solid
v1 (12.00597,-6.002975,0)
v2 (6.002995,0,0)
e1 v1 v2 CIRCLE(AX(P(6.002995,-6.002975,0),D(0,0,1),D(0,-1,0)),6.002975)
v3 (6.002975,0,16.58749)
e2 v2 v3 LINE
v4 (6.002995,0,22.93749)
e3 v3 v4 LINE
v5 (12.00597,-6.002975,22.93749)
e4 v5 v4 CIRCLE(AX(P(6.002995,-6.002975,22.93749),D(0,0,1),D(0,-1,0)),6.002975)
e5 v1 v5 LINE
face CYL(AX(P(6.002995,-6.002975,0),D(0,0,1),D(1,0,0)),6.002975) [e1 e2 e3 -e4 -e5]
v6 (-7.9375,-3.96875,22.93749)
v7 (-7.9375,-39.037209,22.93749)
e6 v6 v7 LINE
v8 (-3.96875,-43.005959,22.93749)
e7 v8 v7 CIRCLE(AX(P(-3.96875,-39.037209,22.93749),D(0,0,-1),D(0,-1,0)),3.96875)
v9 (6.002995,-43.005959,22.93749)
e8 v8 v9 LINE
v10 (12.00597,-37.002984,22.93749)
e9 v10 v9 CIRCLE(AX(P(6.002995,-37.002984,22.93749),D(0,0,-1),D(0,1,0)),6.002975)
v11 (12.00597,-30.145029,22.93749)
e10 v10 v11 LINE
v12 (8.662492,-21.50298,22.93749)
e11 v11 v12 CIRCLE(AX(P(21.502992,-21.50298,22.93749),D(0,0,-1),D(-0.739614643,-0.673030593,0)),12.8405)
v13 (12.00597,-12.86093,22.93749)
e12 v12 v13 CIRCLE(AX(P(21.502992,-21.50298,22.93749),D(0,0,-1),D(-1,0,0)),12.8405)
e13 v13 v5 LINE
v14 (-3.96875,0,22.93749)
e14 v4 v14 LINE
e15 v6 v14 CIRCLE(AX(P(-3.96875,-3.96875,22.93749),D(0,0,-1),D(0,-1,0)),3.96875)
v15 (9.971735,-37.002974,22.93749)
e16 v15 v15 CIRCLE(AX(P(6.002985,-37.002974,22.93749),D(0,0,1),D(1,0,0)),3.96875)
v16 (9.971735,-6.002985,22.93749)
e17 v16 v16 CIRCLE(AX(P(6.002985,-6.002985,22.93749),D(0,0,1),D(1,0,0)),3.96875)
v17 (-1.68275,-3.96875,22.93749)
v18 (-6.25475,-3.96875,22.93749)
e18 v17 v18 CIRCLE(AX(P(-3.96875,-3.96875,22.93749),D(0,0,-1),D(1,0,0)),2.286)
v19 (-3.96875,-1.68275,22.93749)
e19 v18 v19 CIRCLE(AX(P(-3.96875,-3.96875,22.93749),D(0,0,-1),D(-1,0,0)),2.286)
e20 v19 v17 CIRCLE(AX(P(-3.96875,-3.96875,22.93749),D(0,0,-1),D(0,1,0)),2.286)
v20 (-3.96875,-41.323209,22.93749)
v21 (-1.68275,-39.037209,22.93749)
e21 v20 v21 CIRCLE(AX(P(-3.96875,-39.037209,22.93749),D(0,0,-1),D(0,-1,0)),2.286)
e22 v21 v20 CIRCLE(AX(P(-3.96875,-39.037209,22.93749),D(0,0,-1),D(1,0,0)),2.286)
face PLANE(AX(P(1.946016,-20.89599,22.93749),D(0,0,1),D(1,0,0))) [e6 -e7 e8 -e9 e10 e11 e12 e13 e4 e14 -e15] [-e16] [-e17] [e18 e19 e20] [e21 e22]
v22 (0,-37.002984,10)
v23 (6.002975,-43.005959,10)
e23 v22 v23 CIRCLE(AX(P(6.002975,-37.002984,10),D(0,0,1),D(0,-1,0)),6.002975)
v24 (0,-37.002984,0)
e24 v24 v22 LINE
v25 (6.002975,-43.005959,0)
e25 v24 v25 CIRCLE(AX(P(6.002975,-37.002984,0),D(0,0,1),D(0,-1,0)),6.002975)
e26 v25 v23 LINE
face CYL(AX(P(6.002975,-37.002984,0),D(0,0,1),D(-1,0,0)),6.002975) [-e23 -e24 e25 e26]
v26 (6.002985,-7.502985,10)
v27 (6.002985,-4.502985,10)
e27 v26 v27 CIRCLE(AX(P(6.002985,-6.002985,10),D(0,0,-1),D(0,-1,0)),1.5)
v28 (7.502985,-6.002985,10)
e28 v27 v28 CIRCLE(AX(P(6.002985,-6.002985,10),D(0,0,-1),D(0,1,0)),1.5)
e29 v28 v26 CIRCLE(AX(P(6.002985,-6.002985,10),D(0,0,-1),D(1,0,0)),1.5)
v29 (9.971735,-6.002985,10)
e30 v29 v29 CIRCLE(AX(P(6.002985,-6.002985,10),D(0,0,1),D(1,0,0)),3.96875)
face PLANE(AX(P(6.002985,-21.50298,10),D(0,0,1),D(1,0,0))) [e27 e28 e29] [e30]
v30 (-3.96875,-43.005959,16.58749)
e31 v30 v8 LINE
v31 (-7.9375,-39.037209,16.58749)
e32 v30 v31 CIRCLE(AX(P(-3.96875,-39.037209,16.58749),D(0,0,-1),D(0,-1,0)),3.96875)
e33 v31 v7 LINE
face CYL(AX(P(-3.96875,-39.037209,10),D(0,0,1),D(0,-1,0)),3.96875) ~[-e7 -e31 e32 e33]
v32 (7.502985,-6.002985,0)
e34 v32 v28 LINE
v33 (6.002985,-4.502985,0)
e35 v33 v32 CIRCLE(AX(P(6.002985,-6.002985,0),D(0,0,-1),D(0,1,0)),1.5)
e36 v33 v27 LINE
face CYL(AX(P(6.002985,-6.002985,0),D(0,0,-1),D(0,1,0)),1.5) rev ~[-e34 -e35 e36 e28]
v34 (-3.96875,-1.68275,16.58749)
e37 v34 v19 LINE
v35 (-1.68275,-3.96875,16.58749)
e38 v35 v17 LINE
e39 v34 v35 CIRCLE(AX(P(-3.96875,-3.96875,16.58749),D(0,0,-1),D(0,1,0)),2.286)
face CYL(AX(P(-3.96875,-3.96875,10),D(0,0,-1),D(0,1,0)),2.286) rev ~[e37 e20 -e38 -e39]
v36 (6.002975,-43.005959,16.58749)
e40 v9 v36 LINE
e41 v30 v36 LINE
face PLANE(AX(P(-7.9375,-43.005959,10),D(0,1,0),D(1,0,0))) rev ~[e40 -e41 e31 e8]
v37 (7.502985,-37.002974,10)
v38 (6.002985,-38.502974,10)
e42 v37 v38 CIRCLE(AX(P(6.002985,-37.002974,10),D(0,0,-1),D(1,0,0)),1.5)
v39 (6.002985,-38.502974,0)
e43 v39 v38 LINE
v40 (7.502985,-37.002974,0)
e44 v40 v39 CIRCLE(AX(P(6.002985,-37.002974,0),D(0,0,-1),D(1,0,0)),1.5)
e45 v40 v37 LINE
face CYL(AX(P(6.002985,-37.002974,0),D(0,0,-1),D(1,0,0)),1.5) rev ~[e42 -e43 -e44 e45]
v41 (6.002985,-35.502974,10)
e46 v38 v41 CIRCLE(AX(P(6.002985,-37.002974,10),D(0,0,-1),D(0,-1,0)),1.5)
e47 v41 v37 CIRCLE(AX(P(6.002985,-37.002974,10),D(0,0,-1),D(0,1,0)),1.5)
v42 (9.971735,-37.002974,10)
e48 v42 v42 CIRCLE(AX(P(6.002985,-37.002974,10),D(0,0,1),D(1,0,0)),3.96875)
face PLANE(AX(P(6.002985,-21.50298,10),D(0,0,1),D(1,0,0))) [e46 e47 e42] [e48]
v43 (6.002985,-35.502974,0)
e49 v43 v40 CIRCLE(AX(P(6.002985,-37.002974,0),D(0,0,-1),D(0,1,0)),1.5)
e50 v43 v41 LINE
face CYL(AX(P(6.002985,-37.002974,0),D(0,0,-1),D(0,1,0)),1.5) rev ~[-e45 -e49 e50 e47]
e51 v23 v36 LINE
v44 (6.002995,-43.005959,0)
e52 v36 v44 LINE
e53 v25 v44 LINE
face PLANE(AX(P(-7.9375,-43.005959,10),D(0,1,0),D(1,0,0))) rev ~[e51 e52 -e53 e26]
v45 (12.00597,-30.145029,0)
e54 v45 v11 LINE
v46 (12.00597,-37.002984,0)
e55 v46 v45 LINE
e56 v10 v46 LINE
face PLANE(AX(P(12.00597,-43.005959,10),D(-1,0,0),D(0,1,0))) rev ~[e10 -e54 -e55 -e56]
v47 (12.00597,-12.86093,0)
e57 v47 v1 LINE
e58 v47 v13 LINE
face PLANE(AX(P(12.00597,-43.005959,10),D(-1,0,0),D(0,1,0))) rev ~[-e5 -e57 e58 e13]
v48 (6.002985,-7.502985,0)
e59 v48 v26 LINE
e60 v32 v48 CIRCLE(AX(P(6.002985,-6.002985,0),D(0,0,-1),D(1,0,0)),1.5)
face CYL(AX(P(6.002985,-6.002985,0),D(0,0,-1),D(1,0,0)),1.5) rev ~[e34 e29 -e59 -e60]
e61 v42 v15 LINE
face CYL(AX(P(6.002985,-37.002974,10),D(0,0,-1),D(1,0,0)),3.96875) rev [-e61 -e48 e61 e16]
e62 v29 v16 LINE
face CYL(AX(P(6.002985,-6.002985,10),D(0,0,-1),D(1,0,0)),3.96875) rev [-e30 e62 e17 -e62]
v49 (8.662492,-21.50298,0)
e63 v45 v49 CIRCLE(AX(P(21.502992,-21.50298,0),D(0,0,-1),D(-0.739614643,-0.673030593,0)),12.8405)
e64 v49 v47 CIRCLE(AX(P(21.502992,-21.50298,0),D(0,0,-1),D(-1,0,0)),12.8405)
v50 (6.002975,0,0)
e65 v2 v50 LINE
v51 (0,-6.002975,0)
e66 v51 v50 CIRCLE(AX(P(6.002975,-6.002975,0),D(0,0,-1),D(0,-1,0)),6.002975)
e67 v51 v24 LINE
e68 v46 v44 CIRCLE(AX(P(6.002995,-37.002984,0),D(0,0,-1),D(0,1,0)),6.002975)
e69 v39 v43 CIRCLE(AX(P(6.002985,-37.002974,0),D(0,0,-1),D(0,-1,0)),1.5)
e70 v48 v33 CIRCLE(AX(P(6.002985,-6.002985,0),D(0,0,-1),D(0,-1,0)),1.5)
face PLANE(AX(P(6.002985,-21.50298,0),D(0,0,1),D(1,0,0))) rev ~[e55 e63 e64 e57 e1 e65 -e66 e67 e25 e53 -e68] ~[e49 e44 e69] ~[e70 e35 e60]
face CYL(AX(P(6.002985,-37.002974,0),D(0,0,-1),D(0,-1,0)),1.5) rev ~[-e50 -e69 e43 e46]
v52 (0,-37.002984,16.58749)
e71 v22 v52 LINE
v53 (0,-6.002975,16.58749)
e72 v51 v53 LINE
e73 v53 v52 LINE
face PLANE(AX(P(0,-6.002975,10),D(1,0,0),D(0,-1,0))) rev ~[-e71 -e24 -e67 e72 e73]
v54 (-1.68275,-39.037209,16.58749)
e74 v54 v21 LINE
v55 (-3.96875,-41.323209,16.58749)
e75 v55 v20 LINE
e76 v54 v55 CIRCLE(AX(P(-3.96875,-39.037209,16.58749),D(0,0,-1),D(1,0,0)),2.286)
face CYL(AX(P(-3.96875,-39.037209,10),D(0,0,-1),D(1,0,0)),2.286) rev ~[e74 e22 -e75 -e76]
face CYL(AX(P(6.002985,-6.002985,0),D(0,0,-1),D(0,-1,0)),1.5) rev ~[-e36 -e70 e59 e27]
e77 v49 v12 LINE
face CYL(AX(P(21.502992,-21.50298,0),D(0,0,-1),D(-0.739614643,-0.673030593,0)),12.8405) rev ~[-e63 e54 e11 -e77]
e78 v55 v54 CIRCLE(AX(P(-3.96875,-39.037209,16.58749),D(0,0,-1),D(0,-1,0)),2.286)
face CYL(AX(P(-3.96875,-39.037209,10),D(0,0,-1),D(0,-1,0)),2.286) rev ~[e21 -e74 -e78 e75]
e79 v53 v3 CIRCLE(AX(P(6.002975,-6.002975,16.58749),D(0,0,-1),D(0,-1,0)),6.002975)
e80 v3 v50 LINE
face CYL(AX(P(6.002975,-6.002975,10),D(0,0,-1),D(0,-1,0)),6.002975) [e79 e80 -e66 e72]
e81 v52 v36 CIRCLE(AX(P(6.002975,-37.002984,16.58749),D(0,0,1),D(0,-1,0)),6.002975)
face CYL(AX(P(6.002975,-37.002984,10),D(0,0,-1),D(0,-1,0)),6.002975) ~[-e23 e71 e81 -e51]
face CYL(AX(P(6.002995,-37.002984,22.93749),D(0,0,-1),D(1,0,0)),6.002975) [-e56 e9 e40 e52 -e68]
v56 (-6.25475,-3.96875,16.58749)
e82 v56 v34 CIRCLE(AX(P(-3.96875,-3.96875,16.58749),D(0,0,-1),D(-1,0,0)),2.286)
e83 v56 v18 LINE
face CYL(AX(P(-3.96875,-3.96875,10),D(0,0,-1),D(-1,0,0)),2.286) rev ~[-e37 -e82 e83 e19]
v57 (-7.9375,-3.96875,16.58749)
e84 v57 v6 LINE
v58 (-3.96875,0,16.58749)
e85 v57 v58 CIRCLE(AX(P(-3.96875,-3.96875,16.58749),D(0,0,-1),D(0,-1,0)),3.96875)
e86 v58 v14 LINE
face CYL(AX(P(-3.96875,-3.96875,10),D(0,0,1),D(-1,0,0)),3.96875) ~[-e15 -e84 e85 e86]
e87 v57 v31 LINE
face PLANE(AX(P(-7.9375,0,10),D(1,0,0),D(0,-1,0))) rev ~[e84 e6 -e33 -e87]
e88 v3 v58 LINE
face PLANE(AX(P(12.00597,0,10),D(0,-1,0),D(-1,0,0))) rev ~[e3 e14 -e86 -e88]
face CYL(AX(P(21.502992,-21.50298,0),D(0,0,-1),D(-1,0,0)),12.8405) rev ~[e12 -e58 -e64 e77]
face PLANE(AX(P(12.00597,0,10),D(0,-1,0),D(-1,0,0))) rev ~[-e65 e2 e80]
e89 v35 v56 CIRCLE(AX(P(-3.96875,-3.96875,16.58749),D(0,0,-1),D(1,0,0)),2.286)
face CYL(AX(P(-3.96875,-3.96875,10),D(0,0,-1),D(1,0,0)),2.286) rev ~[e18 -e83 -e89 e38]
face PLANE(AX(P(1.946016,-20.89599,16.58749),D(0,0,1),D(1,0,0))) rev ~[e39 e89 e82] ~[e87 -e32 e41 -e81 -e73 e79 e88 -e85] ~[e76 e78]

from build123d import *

# Parameters (mm, degrees)
F1_DEPTH = 10
F2_R     = 3.96875
F3_DEPTH = 12.93749
F4_R     = 6.002975
F5_R     = 3.96875
F7_DEPTH = 22.93749
F8_DEPTH = 6.58749


# Not quite as in the source:
# - a fillet or chamfer is up to 0.001 mm smaller than in the source, because OpenCascade refuses the exact size


with BuildPart() as f1:
    # F0 (on Top) → F1 (new body)
    with BuildSketch(Plane.XY):
        Polygon((6.0029852, 0), (0, 0), (0, -43.0059592), (6.0029852, -43.0059592), (12.0059704, -43.0059592), (12.0059704, 0), align=None)
        with BuildLine():
            ThreePointArc((7.5029852, -37.002974), (7.0636453718, -38.0636341718), (6.0029852, -38.502974))
            ThreePointArc((6.0029852, -38.502974), (4.5029852, -37.002974), (6.0029852, -35.502974))
            ThreePointArc((6.0029852, -35.502974), (7.0636453718, -35.9423138282), (7.5029852, -37.002974))
        make_face(mode=Mode.SUBTRACT)
        with BuildLine():
            ThreePointArc((6.0029852, -7.5029852), (4.5029852, -6.0029852), (6.0029852, -4.5029852))
            ThreePointArc((6.0029852, -4.5029852), (7.0636453718, -4.9423250282), (7.5029852, -6.0029852))
            ThreePointArc((7.5029852, -6.0029852), (7.0636453718, -7.0636453718), (6.0029852, -7.5029852))
        make_face(mode=Mode.SUBTRACT)
    extrude(amount=F1_DEPTH)

    # F2 (on face) → F3 (join)
    with BuildSketch(Plane.XY.offset(10)):
        with BuildLine():
            Line((12.0059704, -43.0059592), (12.0059704, 0))
            Line((12.0059704, 0), (-3.96875, 0))
            Line((-3.96875, 0), (-3.96875, -1.68275))
            ThreePointArc((-3.96875, -1.68275), (-2.3523038982, -2.3523038982), (-1.68275, -3.96875))
            ThreePointArc((-1.68275, -3.96875), (-3.96875, -6.25475), (-6.25475, -3.96875))
            Line((-6.25475, -3.96875), (-7.9375, -3.96875))
            Line((-7.9375, -3.96875), (-7.9375, -43.0059592))
            Line((-7.9375, -43.0059592), (-3.96875, -43.0059592))
            Line((-3.96875, -43.0059592), (12.0059704, -43.0059592))
        make_face()
        with BuildLine():
            ThreePointArc((-1.68275, -39.0372092), (-2.3523038982, -40.6536553018), (-3.96875, -41.3232092))
            ThreePointArc((-3.96875, -41.3232092), (-5.5851961018, -37.4207630982), (-1.68275, -39.0372092))
        make_face(mode=Mode.SUBTRACT)
        with Locations((6.0029852, -37.002974)):
            Circle(F2_R, mode=Mode.SUBTRACT)
        with Locations((6.0029852, -6.0029852)):
            Circle(F2_R, mode=Mode.SUBTRACT)
        with BuildLine():
            Line((-3.96875, -1.68275), (-3.96875, 0))
            Line((-3.96875, 0), (-7.9375, 0))
            Line((-7.9375, 0), (-7.9375, -3.96875))
            Line((-7.9375, -3.96875), (-6.25475, -3.96875))
            ThreePointArc((-6.25475, -3.96875), (-5.5851961018, -2.3523038982), (-3.96875, -1.68275))
        make_face()
    extrude(amount=F3_DEPTH)

    # F4 (radius 6.0029852 in the source; OpenCascade refuses exactly that, so slightly less here)
    f4_edges = [f1.edges().sort_by_distance(p)[0] for p in [
        (12.00597, 0, 11.468745),
        (0, 0, 5),
        (0, -43.005959, 5),
        (12.00597, -43.005959, 11.468745),
    ]]
    fillet(f4_edges, radius=F4_R)

    # F5
    f5_edges = [f1.edges().sort_by_distance(p)[0] for p in [
        (-7.9375, -43.005959, 16.468745),
        (-7.9375, 0, 16.468745),
    ]]
    fillet(f5_edges, radius=F5_R)

    # F6 (on face) → F7 (cut, through all)
    with BuildSketch(Plane(origin=(0, 0, 0), x_dir=(1, 0, 0), z_dir=(0, 0, -1))):
        with BuildLine():
            ThreePointArc((12.0059704, 30.145029001), (9.5274974569, 26.1361174223), (8.6624922, 21.5029796))
            Line((8.6624922, 21.5029796), (12.0059704, 21.5029796))
            Line((12.0059704, 21.5029796), (12.0059704, 30.145029001))
        make_face()
        with BuildLine():
            Line((12.0059704, 21.5029796), (8.6624922, 21.5029796))
            ThreePointArc((8.6624922, 21.5029796), (9.5274974569, 16.8698417777), (12.0059704, 12.860930199))
            Line((12.0059704, 12.860930199), (12.0059704, 21.5029796))
        make_face()
    extrude(amount=-F7_DEPTH, mode=Mode.SUBTRACT)

    # F8 (cut): a face of the model
    f8_faces = [f1.faces().sort_by_distance(p)[0] for p in [
        (-3.6441940758, -21.5029796, 10),
    ]]
    extrude(f8_faces, amount=-F8_DEPTH, mode=Mode.SUBTRACT)


solid = f1.part
